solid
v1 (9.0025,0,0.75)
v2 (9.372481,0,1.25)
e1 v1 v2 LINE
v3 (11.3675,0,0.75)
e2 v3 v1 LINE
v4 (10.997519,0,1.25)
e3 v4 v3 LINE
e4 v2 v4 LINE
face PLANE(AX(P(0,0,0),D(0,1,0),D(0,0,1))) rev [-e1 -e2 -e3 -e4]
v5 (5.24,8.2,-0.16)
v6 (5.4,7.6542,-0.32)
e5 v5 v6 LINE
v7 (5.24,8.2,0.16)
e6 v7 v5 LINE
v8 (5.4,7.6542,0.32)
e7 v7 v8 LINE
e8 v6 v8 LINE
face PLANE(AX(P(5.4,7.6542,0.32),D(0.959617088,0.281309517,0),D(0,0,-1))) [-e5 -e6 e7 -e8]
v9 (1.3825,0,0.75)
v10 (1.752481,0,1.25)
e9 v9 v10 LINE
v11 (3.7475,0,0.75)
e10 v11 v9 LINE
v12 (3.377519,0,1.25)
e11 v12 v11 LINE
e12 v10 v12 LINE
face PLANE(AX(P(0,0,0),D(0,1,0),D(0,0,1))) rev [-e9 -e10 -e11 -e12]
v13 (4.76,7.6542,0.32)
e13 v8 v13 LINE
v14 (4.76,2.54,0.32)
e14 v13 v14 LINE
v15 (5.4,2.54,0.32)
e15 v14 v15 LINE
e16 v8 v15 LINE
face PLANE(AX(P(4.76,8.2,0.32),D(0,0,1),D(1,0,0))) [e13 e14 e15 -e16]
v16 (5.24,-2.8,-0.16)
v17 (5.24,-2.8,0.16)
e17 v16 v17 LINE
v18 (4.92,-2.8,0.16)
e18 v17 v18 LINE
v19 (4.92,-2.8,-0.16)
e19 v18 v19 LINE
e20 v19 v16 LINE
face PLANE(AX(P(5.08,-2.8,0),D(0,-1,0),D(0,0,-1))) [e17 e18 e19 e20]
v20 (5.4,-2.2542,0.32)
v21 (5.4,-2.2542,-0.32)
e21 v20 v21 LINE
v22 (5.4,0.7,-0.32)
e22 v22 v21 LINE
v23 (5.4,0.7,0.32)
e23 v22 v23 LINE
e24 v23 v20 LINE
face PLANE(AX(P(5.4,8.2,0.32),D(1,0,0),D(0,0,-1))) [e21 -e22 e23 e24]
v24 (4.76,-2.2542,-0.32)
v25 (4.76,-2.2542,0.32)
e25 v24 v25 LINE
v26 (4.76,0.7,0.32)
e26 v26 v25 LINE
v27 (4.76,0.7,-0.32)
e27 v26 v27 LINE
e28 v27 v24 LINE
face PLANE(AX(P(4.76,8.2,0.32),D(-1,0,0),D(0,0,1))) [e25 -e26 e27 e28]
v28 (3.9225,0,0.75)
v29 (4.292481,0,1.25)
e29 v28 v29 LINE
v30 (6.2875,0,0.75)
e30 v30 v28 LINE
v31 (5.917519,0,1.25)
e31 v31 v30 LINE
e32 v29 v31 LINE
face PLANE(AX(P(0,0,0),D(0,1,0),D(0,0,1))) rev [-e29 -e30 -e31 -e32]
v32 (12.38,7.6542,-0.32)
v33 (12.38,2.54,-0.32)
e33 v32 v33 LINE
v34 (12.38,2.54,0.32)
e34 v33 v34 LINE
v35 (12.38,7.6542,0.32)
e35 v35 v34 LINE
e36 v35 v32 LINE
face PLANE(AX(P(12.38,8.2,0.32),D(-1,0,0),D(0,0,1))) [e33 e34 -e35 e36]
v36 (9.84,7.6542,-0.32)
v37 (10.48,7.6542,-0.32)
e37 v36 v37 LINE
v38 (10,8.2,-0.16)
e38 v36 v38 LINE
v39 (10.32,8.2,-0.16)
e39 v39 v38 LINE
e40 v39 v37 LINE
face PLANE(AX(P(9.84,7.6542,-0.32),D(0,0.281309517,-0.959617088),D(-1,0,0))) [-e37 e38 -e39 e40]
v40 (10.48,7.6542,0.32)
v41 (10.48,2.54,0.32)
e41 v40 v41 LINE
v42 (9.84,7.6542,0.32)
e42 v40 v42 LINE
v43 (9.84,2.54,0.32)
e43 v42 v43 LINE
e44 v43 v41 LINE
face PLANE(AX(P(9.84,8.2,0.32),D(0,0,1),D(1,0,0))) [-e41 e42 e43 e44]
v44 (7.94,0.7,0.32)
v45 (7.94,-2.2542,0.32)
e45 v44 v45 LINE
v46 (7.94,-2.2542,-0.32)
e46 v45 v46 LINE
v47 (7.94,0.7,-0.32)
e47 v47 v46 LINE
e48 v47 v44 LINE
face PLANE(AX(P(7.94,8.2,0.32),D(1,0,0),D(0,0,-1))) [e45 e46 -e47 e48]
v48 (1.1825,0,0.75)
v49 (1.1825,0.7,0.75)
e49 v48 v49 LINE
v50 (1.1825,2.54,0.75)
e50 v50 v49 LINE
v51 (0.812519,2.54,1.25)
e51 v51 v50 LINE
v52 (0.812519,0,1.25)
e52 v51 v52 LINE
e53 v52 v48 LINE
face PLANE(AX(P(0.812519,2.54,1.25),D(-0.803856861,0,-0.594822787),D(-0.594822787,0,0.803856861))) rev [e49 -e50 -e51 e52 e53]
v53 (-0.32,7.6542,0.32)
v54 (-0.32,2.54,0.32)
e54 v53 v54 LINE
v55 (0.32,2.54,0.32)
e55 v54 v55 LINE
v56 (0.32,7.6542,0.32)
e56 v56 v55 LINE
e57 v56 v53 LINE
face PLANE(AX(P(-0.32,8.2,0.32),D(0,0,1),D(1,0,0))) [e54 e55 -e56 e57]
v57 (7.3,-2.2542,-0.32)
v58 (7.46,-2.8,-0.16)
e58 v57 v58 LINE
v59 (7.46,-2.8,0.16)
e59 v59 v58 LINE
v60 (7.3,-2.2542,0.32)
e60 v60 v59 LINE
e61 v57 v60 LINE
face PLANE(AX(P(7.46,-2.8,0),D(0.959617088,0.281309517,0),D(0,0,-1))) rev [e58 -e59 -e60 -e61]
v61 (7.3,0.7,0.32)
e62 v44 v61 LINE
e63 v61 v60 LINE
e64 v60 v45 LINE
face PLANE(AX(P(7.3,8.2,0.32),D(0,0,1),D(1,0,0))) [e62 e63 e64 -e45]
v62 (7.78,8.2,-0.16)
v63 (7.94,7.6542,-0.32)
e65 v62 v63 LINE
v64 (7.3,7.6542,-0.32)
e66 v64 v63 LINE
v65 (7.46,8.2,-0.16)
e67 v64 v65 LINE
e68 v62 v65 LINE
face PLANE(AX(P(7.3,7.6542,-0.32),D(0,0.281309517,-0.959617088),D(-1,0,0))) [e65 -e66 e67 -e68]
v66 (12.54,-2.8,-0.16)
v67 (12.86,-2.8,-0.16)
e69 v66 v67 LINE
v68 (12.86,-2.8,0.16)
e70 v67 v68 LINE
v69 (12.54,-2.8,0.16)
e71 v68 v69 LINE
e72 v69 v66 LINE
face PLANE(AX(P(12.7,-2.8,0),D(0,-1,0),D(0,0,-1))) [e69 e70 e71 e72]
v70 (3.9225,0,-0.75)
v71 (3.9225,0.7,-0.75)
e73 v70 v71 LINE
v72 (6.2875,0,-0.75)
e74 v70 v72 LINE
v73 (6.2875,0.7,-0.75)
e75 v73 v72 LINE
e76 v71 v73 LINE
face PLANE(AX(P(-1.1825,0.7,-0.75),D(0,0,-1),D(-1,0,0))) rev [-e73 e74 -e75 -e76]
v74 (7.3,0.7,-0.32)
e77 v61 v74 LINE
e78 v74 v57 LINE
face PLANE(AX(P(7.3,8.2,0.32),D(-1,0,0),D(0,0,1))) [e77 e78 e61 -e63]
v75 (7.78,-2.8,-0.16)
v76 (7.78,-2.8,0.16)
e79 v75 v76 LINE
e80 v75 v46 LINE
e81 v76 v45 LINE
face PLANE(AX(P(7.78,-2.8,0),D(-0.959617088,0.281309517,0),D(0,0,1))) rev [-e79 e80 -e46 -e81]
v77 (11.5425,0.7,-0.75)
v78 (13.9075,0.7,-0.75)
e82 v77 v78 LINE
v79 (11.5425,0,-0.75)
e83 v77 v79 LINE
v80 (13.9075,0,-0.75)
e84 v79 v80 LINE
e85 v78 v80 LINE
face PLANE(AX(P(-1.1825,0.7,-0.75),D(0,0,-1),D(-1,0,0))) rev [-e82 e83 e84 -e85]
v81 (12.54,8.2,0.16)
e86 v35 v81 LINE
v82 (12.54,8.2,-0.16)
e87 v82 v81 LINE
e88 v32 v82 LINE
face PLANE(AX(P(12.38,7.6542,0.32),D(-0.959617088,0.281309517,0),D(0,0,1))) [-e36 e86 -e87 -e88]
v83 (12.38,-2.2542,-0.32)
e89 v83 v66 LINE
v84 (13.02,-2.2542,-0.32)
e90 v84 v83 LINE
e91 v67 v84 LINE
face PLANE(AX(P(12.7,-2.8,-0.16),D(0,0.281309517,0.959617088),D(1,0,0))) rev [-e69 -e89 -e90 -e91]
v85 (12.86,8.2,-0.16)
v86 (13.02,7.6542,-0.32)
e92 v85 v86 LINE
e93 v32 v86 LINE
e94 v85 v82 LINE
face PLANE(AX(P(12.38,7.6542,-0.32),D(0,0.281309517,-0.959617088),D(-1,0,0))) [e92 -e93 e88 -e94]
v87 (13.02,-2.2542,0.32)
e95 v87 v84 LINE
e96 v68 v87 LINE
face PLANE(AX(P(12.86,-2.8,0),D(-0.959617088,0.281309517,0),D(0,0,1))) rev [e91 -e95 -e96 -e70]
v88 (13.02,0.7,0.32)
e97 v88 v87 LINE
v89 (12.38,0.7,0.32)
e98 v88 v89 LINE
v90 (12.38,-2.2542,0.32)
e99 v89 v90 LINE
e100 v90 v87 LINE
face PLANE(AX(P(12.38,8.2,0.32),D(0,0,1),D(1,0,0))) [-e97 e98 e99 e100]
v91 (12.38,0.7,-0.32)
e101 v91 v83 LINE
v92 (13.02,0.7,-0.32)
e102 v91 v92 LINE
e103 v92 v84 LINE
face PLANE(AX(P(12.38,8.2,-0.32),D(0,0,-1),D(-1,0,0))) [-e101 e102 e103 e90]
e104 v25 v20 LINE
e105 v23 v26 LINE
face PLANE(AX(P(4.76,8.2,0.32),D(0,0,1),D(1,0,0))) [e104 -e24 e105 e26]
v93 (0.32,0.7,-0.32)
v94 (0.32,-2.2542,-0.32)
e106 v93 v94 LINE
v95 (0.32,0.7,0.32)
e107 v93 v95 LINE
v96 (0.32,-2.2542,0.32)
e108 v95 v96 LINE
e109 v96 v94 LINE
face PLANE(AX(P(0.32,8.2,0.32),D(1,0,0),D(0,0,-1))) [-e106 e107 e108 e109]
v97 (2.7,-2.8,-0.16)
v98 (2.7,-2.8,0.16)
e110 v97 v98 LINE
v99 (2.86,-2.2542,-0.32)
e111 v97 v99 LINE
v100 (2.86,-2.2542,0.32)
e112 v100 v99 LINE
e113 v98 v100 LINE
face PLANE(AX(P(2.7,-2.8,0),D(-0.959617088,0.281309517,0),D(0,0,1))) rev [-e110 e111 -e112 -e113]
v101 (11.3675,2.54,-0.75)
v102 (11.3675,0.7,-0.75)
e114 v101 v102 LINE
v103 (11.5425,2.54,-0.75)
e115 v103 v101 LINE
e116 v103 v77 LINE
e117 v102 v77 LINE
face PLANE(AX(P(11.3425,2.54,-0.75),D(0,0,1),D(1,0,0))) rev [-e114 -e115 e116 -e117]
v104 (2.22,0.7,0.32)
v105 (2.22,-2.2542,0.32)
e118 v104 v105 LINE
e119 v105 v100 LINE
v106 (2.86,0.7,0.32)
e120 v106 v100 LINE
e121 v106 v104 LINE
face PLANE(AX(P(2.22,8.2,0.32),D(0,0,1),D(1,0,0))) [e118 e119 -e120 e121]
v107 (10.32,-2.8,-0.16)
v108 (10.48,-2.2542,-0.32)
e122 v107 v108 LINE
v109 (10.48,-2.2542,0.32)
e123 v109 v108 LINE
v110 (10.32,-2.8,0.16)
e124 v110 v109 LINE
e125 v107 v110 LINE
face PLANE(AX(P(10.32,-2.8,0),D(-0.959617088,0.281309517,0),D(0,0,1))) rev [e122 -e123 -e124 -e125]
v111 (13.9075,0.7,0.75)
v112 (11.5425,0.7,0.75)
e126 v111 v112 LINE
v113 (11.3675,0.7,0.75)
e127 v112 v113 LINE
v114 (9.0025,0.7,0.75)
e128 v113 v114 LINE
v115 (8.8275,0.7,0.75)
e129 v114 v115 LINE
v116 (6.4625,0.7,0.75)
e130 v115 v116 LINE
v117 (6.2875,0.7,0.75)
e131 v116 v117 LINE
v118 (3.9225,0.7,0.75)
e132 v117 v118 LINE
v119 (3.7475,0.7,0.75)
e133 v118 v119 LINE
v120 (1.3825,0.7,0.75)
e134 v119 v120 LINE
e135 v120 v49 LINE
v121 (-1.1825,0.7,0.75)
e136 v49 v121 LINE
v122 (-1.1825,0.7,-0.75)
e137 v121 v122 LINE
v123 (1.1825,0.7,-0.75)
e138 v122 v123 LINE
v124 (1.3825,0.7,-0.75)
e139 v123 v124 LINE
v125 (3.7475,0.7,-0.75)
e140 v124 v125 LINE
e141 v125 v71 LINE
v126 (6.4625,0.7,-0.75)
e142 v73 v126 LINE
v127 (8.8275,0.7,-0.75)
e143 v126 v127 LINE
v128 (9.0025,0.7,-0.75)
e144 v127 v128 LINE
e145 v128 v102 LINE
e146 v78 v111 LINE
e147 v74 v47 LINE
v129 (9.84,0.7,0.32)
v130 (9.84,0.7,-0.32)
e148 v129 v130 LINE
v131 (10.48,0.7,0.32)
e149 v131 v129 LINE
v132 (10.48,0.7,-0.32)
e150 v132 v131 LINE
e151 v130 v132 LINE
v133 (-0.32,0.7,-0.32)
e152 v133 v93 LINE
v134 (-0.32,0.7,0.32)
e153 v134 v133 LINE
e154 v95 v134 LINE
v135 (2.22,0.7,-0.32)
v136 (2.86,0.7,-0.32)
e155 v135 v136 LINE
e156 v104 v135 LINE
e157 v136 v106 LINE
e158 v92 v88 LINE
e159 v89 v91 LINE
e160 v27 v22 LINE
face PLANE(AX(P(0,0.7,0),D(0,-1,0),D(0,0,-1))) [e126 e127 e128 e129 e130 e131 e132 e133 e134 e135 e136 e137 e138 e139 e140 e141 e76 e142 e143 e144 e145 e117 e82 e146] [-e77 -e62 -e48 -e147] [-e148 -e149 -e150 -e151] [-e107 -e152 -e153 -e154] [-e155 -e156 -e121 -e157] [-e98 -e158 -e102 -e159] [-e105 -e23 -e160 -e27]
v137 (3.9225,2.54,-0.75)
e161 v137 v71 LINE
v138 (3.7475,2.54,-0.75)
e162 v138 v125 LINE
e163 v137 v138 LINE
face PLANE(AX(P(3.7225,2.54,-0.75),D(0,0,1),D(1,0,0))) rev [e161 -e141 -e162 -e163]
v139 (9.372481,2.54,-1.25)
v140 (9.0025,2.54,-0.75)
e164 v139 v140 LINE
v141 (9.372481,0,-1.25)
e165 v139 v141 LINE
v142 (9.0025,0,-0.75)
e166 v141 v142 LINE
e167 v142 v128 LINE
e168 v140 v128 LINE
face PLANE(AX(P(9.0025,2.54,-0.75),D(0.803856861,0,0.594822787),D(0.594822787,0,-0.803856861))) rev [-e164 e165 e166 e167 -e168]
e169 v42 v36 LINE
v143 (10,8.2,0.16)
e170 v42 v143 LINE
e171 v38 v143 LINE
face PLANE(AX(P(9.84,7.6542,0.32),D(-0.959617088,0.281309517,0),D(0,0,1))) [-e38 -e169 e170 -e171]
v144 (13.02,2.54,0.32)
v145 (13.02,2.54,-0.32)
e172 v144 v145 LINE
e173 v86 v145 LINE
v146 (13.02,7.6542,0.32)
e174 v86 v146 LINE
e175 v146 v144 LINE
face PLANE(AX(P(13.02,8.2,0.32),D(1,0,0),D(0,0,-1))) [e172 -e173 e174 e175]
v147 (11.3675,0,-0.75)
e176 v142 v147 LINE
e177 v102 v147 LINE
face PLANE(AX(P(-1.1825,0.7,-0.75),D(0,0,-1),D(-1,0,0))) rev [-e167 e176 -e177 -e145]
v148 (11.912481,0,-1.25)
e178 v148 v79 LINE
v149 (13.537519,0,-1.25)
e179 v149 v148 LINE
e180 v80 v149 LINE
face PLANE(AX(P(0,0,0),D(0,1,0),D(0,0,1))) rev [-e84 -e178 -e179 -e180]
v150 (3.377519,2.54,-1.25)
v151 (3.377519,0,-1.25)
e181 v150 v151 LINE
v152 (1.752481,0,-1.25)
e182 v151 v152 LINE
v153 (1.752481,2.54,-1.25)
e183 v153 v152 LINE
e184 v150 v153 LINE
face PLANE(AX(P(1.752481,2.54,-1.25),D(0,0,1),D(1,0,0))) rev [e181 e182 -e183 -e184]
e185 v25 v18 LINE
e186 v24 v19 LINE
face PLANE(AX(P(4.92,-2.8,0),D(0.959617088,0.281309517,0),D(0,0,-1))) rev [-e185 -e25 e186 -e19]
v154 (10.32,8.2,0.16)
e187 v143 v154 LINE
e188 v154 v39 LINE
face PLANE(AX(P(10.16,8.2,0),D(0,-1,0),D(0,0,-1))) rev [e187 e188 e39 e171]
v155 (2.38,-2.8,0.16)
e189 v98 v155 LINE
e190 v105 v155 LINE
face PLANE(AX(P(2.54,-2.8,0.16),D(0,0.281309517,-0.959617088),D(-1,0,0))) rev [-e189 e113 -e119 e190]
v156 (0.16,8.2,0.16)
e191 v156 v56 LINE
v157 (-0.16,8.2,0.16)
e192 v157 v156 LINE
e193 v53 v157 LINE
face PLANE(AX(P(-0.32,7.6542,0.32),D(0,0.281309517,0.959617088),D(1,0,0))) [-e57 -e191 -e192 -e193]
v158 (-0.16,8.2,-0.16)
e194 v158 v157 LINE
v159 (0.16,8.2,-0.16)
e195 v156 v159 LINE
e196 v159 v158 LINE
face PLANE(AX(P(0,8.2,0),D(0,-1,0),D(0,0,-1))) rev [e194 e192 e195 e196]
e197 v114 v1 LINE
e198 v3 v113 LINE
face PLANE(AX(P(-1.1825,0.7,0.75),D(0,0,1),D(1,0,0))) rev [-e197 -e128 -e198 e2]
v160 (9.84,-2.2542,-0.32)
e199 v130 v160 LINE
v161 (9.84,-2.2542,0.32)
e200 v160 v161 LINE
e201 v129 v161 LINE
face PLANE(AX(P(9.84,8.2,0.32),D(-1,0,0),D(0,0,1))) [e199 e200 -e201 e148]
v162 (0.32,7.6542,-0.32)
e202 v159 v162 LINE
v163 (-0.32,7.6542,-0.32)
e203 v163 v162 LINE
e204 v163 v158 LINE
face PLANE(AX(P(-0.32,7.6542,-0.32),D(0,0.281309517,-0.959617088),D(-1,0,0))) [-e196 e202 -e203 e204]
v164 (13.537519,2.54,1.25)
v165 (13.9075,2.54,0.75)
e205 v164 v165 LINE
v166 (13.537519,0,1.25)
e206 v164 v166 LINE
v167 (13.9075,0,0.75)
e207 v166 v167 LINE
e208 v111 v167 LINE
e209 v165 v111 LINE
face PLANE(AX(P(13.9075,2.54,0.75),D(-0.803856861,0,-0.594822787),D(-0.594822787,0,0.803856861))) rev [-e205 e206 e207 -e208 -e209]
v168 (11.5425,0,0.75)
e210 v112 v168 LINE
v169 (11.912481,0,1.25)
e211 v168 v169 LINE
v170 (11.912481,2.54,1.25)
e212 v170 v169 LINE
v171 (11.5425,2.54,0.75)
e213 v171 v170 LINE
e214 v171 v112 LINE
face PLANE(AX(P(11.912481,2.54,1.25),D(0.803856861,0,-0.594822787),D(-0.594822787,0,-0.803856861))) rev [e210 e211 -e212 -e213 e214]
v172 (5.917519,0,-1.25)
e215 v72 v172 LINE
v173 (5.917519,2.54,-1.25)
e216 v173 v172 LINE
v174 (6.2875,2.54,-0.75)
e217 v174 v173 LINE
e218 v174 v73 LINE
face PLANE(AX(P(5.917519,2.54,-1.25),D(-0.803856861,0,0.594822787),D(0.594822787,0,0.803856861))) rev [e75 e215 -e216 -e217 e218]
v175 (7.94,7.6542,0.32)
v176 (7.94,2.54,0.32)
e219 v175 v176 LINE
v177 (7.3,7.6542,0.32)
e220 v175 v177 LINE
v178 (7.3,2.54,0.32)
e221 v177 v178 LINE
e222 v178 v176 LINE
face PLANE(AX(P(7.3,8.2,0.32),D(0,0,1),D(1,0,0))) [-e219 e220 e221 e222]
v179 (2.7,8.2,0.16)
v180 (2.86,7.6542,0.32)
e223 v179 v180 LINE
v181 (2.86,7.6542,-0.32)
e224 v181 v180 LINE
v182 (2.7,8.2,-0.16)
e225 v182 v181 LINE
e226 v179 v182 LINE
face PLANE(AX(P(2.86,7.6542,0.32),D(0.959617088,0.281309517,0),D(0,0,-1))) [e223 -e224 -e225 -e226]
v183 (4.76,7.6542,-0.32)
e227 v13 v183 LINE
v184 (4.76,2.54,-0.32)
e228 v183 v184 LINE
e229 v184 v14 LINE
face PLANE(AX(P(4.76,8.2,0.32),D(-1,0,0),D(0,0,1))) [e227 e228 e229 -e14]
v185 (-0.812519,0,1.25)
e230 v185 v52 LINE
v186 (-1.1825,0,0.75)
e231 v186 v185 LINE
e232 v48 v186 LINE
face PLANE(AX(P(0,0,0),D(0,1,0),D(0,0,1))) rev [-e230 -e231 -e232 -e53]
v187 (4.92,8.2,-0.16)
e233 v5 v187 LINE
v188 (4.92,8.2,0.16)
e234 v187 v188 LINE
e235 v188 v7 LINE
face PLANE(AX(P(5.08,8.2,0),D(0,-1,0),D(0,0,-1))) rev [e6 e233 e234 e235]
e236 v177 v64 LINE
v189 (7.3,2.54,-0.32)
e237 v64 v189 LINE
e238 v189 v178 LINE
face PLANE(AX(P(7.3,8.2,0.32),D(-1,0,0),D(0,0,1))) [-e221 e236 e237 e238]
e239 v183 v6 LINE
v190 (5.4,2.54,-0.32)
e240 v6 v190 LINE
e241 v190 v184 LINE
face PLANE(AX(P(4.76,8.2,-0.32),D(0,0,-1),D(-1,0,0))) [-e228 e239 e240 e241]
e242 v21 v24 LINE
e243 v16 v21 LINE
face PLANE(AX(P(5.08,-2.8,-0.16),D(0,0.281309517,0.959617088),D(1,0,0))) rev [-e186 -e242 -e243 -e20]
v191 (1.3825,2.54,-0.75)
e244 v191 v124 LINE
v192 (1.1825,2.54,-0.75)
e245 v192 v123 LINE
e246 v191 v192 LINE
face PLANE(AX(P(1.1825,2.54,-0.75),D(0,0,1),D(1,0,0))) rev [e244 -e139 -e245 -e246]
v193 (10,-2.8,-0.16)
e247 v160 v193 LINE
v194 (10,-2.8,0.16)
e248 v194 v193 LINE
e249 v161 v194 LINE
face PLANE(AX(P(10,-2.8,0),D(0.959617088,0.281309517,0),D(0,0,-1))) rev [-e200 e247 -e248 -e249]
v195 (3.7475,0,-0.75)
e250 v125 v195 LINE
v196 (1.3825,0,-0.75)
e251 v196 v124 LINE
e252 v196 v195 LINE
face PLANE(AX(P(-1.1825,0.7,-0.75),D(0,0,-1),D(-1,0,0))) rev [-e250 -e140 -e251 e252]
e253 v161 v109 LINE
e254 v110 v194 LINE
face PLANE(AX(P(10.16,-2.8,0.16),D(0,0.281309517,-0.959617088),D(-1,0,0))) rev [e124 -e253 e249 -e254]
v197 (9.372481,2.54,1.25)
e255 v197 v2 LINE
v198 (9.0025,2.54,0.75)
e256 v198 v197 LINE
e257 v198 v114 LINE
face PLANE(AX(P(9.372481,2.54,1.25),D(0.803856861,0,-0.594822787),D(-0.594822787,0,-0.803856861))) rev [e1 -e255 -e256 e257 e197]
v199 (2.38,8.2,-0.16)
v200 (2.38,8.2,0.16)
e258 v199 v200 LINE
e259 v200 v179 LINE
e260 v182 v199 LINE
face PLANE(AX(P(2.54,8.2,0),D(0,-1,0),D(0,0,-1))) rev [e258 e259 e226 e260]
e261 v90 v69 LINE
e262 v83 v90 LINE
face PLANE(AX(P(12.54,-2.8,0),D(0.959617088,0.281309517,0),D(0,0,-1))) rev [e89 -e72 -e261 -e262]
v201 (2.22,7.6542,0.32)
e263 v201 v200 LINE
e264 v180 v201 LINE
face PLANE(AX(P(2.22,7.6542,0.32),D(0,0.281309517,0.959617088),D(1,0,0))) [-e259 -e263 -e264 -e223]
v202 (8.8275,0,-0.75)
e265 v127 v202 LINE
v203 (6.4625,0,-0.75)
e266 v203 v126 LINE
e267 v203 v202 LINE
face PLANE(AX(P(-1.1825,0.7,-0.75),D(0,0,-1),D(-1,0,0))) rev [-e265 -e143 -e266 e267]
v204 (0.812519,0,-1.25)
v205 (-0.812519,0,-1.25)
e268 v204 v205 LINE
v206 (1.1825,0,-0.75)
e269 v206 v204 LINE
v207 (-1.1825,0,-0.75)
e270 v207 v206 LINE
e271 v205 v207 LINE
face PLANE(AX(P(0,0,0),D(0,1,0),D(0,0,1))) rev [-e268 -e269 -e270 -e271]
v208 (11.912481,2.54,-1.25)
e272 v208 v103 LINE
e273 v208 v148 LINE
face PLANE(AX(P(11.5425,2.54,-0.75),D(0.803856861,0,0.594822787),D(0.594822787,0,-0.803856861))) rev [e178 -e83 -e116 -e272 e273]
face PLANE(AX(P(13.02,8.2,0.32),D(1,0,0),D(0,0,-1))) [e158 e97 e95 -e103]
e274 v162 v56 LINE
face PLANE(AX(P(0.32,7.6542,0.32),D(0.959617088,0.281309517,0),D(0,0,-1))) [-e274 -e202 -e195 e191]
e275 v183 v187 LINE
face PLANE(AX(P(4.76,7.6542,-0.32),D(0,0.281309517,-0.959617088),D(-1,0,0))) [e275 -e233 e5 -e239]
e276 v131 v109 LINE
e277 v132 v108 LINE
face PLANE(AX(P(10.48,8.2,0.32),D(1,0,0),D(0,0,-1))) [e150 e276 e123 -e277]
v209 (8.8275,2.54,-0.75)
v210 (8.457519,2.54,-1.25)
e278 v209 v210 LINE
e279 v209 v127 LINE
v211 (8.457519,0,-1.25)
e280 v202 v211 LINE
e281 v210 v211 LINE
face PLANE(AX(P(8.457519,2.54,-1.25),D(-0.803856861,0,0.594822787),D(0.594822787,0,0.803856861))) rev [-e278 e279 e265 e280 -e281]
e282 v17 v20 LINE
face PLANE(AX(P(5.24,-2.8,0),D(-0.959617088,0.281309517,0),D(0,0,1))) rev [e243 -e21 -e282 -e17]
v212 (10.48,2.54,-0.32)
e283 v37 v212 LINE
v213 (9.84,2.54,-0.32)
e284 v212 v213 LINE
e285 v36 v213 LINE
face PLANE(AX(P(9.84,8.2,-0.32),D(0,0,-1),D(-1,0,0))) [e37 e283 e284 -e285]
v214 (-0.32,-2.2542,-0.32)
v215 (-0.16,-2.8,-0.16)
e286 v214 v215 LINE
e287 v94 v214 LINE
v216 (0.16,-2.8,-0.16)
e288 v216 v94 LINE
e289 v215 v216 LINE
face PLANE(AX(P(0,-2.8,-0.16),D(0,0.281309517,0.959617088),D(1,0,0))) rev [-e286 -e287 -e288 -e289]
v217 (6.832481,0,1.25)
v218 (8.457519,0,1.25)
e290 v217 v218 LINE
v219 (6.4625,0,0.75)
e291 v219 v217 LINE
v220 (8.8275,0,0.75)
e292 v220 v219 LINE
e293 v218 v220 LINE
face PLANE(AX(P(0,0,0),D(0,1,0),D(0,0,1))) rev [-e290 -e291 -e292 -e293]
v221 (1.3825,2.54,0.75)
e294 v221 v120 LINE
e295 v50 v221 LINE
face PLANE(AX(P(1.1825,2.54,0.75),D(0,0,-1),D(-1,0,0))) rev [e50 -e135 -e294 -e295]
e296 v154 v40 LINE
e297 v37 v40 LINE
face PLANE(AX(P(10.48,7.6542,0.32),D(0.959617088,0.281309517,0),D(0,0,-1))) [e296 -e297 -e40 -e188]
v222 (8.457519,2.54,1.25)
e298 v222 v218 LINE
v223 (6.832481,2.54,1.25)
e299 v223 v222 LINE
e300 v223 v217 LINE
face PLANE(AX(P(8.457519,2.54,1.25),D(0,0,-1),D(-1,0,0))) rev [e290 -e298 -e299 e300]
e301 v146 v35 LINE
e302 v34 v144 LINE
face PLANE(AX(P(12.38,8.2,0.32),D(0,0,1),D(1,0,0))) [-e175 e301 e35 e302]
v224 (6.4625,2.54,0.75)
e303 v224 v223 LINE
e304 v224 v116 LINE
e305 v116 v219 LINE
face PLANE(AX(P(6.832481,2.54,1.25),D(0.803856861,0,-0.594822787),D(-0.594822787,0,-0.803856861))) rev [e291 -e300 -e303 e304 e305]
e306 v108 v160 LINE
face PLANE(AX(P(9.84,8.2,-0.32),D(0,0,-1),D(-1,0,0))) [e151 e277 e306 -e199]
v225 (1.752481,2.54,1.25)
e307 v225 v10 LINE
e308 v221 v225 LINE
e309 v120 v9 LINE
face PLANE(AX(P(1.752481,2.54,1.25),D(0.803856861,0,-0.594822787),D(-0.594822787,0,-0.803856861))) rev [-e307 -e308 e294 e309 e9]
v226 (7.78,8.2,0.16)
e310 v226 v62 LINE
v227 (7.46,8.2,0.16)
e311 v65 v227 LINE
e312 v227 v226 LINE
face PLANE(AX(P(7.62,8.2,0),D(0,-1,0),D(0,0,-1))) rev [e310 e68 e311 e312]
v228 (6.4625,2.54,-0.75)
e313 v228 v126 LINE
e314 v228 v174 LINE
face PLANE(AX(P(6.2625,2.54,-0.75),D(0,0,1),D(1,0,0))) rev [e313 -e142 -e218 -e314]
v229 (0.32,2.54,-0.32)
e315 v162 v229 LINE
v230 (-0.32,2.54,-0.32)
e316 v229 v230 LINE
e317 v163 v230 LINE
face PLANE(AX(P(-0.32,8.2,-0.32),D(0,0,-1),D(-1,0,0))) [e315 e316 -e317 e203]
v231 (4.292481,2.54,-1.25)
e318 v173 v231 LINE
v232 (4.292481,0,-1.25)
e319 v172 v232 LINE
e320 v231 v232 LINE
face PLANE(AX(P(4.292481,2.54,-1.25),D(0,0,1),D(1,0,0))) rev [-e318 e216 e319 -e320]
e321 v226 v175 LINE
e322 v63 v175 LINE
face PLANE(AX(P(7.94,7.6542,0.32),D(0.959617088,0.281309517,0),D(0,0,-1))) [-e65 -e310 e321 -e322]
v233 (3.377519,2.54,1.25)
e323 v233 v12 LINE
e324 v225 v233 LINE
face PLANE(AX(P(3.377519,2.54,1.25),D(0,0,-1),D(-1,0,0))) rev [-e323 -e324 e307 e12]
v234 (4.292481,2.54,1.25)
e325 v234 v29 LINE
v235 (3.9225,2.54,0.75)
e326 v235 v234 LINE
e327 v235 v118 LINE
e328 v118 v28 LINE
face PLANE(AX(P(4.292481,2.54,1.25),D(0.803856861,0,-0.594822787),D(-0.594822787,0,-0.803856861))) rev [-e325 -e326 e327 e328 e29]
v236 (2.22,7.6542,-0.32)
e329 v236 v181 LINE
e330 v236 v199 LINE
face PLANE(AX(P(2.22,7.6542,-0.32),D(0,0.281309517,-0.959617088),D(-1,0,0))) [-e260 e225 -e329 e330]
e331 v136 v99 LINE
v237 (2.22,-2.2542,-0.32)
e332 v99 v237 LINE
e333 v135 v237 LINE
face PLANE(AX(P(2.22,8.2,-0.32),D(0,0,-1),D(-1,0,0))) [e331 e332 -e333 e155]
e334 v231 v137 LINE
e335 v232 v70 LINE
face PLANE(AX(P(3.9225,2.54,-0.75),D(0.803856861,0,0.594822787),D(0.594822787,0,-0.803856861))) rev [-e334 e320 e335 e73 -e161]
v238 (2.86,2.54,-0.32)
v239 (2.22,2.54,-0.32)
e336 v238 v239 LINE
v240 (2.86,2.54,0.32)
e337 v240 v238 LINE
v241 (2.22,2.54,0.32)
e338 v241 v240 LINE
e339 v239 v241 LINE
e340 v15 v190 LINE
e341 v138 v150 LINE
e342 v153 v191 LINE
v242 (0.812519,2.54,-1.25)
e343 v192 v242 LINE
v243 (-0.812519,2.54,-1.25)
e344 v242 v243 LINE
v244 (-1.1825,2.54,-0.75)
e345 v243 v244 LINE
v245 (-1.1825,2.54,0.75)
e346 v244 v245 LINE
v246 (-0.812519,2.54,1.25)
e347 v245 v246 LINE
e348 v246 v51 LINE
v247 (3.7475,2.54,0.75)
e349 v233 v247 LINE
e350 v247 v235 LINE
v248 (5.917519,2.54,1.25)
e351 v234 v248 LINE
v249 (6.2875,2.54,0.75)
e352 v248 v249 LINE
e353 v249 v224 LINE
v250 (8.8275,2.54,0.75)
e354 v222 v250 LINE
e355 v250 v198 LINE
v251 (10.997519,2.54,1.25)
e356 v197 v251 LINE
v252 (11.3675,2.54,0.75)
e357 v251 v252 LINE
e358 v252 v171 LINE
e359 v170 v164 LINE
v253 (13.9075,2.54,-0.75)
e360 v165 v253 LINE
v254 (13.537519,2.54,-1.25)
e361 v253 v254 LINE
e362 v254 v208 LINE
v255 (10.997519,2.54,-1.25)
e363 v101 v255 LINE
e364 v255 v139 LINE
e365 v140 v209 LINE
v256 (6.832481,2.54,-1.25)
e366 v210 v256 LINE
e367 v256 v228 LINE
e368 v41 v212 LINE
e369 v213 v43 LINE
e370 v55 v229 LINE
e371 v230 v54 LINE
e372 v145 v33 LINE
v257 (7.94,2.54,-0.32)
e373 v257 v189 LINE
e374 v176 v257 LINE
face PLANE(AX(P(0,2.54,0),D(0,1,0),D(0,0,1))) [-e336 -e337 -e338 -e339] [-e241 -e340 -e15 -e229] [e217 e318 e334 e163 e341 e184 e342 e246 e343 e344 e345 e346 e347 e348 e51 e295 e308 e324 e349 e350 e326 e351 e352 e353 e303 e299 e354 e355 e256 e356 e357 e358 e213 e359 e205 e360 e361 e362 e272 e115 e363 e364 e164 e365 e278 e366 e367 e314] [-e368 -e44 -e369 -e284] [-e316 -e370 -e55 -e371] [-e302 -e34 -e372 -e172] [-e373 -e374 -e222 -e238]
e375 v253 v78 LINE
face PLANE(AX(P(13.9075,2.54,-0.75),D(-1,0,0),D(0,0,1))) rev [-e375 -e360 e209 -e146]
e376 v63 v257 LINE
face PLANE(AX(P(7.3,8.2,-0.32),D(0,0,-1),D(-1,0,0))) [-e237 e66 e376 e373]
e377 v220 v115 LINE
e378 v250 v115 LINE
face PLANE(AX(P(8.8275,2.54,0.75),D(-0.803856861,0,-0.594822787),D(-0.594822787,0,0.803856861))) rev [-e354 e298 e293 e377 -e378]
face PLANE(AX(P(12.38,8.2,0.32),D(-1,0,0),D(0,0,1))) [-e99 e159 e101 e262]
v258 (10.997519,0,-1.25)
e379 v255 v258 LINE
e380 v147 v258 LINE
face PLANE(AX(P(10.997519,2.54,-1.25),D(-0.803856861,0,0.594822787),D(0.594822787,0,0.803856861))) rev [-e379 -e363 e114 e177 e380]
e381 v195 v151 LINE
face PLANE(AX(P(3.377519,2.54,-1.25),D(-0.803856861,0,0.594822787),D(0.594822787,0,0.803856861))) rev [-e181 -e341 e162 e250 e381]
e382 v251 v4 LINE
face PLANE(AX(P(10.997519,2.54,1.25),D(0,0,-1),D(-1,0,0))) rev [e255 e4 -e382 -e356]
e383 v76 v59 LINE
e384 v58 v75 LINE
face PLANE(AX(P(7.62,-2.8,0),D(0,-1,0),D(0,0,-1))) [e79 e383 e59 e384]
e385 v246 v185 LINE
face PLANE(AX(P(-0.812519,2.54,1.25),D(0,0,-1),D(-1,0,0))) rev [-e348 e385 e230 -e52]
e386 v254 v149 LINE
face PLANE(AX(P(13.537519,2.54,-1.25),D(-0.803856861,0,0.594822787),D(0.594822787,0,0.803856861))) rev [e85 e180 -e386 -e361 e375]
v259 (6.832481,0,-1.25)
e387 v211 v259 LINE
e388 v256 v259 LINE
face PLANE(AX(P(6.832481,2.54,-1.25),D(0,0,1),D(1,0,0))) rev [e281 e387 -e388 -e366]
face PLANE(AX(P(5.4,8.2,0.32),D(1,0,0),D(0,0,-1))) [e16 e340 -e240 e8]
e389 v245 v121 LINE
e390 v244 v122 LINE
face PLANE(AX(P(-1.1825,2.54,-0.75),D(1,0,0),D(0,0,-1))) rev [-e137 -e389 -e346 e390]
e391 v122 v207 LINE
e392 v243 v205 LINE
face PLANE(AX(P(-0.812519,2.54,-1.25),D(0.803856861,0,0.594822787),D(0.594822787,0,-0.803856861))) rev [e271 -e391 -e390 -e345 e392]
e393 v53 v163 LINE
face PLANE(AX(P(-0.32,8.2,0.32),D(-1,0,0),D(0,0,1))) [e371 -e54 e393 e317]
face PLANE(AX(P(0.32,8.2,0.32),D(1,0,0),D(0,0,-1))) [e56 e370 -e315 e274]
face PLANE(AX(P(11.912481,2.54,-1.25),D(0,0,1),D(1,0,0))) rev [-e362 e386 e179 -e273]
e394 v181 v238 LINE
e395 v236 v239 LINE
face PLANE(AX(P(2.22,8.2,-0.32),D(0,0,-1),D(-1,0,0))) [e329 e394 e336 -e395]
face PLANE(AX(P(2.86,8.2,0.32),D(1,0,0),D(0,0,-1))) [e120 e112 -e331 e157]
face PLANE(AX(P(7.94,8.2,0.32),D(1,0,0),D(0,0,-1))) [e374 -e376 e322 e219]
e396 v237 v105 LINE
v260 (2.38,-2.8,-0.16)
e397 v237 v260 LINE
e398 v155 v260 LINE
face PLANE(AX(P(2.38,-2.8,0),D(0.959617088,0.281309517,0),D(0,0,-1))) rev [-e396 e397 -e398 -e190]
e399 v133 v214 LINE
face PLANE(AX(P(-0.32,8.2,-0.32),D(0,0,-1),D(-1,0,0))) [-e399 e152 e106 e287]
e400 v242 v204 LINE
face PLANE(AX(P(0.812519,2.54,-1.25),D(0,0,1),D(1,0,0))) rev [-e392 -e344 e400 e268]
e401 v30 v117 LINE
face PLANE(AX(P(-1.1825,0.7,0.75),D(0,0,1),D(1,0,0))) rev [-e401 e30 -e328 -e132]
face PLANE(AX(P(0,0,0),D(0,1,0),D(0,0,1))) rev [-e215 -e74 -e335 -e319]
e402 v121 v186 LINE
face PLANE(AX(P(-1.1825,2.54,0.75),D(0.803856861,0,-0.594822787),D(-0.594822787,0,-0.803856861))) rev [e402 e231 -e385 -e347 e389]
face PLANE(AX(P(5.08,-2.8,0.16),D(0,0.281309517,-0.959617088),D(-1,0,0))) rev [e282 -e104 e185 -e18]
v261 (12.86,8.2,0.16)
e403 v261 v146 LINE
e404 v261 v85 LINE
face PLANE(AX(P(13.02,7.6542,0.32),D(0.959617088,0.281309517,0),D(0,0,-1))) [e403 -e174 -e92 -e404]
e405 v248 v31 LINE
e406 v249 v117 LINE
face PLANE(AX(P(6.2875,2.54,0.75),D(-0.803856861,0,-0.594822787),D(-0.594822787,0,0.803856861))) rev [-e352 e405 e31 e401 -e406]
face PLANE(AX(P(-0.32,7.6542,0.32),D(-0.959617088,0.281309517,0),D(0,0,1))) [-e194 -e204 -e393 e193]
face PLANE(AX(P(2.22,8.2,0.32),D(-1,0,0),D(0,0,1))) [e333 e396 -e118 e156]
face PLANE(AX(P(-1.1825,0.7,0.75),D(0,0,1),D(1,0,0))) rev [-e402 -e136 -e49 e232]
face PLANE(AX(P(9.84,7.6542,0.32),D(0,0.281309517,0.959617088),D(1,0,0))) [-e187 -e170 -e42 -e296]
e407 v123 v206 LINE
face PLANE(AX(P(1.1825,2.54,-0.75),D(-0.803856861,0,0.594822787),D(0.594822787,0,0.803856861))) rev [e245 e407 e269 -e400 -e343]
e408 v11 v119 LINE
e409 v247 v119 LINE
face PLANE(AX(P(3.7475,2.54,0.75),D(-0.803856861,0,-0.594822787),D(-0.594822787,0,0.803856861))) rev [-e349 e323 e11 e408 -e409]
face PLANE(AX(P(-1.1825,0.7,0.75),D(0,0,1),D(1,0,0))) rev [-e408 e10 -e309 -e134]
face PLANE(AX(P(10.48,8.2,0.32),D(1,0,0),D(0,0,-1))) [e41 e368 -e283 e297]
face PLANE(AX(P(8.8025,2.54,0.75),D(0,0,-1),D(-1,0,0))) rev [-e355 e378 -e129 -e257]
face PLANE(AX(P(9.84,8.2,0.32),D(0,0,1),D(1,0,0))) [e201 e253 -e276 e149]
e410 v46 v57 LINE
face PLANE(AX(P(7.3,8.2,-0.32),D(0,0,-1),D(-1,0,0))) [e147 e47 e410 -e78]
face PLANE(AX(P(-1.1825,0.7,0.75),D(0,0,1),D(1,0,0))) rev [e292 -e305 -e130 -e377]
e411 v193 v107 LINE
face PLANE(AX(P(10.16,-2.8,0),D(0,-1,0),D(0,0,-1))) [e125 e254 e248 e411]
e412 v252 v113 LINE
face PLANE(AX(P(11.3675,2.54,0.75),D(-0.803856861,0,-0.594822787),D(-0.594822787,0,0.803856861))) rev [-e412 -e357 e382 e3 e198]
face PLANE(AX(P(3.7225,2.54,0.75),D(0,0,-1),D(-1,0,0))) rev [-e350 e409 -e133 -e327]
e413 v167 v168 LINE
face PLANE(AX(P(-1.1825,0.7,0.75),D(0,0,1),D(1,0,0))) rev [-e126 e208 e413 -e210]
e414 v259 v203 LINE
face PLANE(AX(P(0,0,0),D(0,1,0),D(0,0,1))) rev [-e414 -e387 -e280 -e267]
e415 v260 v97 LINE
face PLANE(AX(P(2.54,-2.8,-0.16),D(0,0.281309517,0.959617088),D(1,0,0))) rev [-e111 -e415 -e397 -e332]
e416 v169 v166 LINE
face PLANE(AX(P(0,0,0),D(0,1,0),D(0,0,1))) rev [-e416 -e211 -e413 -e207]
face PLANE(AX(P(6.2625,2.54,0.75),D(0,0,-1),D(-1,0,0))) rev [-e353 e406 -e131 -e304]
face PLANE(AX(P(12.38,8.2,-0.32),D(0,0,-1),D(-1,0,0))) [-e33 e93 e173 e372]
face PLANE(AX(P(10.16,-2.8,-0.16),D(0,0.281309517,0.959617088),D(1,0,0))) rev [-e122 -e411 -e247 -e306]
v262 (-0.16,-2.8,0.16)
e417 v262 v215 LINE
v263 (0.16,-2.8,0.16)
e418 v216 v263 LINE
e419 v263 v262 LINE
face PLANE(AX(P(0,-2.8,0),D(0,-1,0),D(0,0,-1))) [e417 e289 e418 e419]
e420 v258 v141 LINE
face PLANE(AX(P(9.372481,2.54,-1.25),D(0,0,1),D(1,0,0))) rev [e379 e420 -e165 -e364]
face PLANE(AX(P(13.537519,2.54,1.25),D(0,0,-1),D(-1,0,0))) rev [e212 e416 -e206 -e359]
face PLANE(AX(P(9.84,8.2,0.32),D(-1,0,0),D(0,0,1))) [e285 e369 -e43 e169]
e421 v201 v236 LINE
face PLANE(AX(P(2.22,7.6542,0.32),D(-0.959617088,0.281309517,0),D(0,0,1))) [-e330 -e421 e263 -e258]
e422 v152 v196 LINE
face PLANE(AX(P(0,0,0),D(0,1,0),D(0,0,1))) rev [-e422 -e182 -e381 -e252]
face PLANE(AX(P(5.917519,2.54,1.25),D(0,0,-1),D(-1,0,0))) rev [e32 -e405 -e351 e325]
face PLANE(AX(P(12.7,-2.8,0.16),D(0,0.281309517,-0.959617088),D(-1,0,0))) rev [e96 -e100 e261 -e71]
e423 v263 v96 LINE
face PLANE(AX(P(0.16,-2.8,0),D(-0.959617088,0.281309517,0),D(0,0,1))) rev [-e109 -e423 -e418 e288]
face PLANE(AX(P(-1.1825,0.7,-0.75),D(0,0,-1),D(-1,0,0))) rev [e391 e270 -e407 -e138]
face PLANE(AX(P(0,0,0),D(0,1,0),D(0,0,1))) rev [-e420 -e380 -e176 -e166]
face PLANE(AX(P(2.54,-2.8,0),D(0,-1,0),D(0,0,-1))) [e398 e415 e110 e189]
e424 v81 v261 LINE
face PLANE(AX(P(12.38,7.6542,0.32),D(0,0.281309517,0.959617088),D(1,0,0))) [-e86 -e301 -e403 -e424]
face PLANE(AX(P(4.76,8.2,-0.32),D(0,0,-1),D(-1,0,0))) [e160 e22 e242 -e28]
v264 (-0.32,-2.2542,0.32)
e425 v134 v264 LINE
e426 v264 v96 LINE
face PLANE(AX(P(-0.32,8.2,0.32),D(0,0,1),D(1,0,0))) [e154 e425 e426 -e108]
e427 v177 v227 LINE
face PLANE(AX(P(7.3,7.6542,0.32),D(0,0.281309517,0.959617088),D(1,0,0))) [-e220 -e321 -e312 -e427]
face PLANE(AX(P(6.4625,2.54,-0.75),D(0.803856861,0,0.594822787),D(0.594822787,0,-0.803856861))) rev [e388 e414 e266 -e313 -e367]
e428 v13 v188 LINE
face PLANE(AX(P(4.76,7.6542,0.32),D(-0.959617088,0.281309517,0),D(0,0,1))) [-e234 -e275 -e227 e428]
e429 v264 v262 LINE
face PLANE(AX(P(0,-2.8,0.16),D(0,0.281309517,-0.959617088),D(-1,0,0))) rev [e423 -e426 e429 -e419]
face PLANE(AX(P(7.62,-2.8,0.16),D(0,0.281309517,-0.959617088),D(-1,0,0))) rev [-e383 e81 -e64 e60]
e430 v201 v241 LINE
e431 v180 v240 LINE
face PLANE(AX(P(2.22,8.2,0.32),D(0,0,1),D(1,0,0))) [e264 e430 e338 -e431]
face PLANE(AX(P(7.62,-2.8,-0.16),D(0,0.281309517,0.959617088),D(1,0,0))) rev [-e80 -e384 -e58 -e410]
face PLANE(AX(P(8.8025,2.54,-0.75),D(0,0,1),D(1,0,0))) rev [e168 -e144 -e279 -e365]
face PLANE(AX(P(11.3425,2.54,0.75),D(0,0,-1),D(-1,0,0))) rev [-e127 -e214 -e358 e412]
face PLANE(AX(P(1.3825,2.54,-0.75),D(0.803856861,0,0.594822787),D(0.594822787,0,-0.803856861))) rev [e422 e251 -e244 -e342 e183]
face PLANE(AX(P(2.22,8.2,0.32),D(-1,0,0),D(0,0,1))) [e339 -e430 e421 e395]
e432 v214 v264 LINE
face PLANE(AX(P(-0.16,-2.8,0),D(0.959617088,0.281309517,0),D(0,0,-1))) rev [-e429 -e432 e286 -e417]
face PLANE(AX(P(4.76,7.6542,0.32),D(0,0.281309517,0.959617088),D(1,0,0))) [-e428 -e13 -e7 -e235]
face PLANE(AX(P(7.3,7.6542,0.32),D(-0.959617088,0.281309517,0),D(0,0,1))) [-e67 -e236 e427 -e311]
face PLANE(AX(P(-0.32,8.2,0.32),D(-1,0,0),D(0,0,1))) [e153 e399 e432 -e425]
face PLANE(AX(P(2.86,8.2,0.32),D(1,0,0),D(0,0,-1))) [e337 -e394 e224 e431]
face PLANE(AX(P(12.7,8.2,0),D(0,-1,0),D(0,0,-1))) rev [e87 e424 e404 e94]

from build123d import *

# Parameters (mm, degrees)
BOSS_EXTRUDE3_DEPTH = 2.54
BOSS_EXTRUDE4_DEPTH = 2.54
LPATTERN1_COUNT     = 5
LPATTERN1_PITCH     = 2.54
SKETCH8_W           = 100
SKETCH8_H           = 1.5
CUT_EXTRUDE4_DEPTH  = 0.7
BOSS_EXTRUDE5_START = -8.2
SKETCH3_W           = 0.64
SKETCH3_H           = 0.64
BOSS_EXTRUDE5_DEPTH = 11
CHAMFER1_SIZE       = 0.16
CHAMFER1_SIZE2      = 0.5458
CHAMFER2_SIZE       = 0.16
CHAMFER2_SIZE2      = 0.5458
LPATTERN2_START     = 2.22
LPATTERN2_DEPTH     = 0.64
LPATTERN2_START_2   = 4.76
LPATTERN2_2_DEPTH   = 0.64
LPATTERN2_START_3   = 7.3
LPATTERN2_3_DEPTH   = 0.64
LPATTERN2_START_4   = 9.84
LPATTERN2_4_DEPTH   = 0.64
LPATTERN2_START_5   = 12.38
LPATTERN2_5_DEPTH   = 0.64
LPATTERN2_START_6   = -1
LPATTERN2_6_DEPTH   = 2


with BuildPart() as part:
    # Sketch6 → Boss-Extrude3 (new body)
    with BuildSketch(Plane(origin=(0, 0, 0), x_dir=(1, 0, 0), z_dir=(0, 1, 0))):
        Polygon((-1.1825, 0.75), (-1.1825, -0.75), (-0.812519462, -1.25), (0.812519462, -1.25), (1.1825, -0.75), (1.1825, 0.75), (0.812519462, 1.25), (-0.812519462, 1.25), align=None)
    extrude(amount=BOSS_EXTRUDE3_DEPTH)

    # Sketch7 → Boss-Extrude4 (add)
    with BuildSketch(Plane(origin=(0, 0, 0), x_dir=(1, 0, 0), z_dir=(0, 1, 0))):
        Polygon((1.1825, 0.75), (1.1825, -0.75), (1.3825, -0.75), (1.752480538, -1.25), (3.377519462, -1.25), (3.7475, -0.75), (3.7475, 0.75), (3.377519462, 1.25), (1.752480538, 1.25), (1.3825, 0.75), align=None)
    boss_extrude4 = extrude(amount=BOSS_EXTRUDE4_DEPTH)

    # LPattern1: Boss-Extrude4 ×5
    with Locations(*[(i * LPATTERN1_PITCH, 0, 0) for i in range(1, LPATTERN1_COUNT)]):
        add(boss_extrude4)

    # Sketch8 → Cut-Extrude4 (cut)
    with BuildSketch(Plane.XZ):
        with Locations((48.8175, 0)):
            Rectangle(SKETCH8_W, SKETCH8_H)
    extrude(amount=-CUT_EXTRUDE4_DEPTH, mode=Mode.SUBTRACT)

    # Sketch3 → Boss-Extrude5 (add)
    with BuildSketch(Plane(origin=(0, 0, 0), x_dir=(-1, 0, 0), z_dir=(0, -1, 0)).offset(BOSS_EXTRUDE5_START)):
        Rectangle(SKETCH3_W, SKETCH3_H)
    extrude(amount=BOSS_EXTRUDE5_DEPTH)

    # Chamfer1
    chamfer1_edges = [part.edges().sort_by_distance(p)[0] for p in [
        (-0.32, -2.8, 0),
        (0, -2.8, -0.32),
        (0.32, -2.8, 0),
        (0, -2.8, 0.32),
    ]]
    chamfer1_side = [part.faces().sort_by_distance(p)[0] for p in [
        (0, -2.8, 0),
    ]]
    chamfer(chamfer1_edges, length=CHAMFER1_SIZE, length2=CHAMFER1_SIZE2, reference=chamfer1_side[0])

    # Chamfer2
    chamfer2_edges = [part.edges().sort_by_distance(p)[0] for p in [
        (-0.32, 8.2, 0),
        (0, 8.2, 0.32),
        (0.32, 8.2, 0),
        (0, 8.2, -0.32),
    ]]
    chamfer2_side = [part.faces().sort_by_distance(p)[0] for p in [
        (0, 8.2, 0),
    ]]
    chamfer(chamfer2_edges, length=CHAMFER2_SIZE, length2=CHAMFER2_SIZE2, reference=chamfer2_side[0])

    # LPattern2: read off the stored shape, not the designer's step
    # LPattern2 outline → LPattern2 (add)
    with BuildSketch(Plane.YZ.offset(LPATTERN2_START)):
        Polygon((-2.2542, 0.32), (-2.8, 0.16), (-2.8, -0.16), (-2.2542, -0.32), (0.7, -0.32), (0.7, 0.32), align=None)
        Polygon((2.54, 0.32), (2.54, -0.32), (7.6542, -0.32), (8.2, -0.16), (8.2, 0.16), (7.6542, 0.32), align=None)
    extrude(amount=LPATTERN2_DEPTH)

    # LPattern2 2 outline → LPattern2 2 (add)
    with BuildSketch(Plane.YZ.offset(LPATTERN2_START_2)):
        Polygon((-2.2542, 0.32), (-2.8, 0.16), (-2.8, -0.16), (-2.2542, -0.32), (0.7, -0.32), (0.7, 0.32), align=None)
        Polygon((2.54, 0.32), (2.54, -0.32), (7.6542, -0.32), (8.2, -0.16), (8.2, 0.16), (7.6542, 0.32), align=None)
    extrude(amount=LPATTERN2_2_DEPTH)

    # LPattern2 3 outline → LPattern2 3 (add)
    with BuildSketch(Plane.YZ.offset(LPATTERN2_START_3)):
        Polygon((-2.2542, 0.32), (-2.8, 0.16), (-2.8, -0.16), (-2.2542, -0.32), (0.7, -0.32), (0.7, 0.32), align=None)
        Polygon((2.54, 0.32), (2.54, -0.32), (7.6542, -0.32), (8.2, -0.16), (8.2, 0.16), (7.6542, 0.32), align=None)
    extrude(amount=LPATTERN2_3_DEPTH)

    # LPattern2 4 outline → LPattern2 4 (add)
    with BuildSketch(Plane.YZ.offset(LPATTERN2_START_4)):
        Polygon((-2.2542, 0.32), (-2.8, 0.16), (-2.8, -0.16), (-2.2542, -0.32), (0.7, -0.32), (0.7, 0.32), align=None)
        Polygon((2.54, 0.32), (2.54, -0.32), (7.6542, -0.32), (8.2, -0.16), (8.2, 0.16), (7.6542, 0.32), align=None)
    extrude(amount=LPATTERN2_4_DEPTH)

    # LPattern2 5 outline → LPattern2 5 (add)
    with BuildSketch(Plane.YZ.offset(LPATTERN2_START_5)):
        Polygon((-2.2542, 0.32), (-2.8, 0.16), (-2.8, -0.16), (-2.2542, -0.32), (0.7, -0.32), (0.7, 0.32), align=None)
        Polygon((2.54, 0.32), (2.54, -0.32), (7.6542, -0.32), (8.2, -0.16), (8.2, 0.16), (7.6542, 0.32), align=None)
    extrude(amount=LPATTERN2_5_DEPTH)

    # LPattern2 6 outline → LPattern2 6 (cut)
    with BuildSketch(Plane.XY.offset(LPATTERN2_START_6)):
        Polygon((2.86, -2.8), (2.86, -2.2542), (2.7, -2.8), align=None)
        Polygon((2.22, -2.8), (2.38, -2.8), (2.22, -2.2542), align=None)
        Polygon((4.76, -2.8), (4.92, -2.8), (4.76, -2.2542), align=None)
        Polygon((5.4, -2.2542), (5.24, -2.8), (5.4, -2.8), align=None)
        Polygon((7.3, -2.8), (7.46, -2.8), (7.3, -2.2542), align=None)
        Polygon((7.94, -2.2542), (7.78, -2.8), (7.94, -2.8), align=None)
        Polygon((9.84, -2.8), (10, -2.8), (9.84, -2.2542), align=None)
        Polygon((10.48, -2.2542), (10.32, -2.8), (10.48, -2.8), align=None)
        Polygon((12.38, -2.8), (12.54, -2.8), (12.38, -2.2542), align=None)
        Polygon((13.02, -2.2542), (12.86, -2.8), (13.02, -2.8), align=None)
        Polygon((2.22, 7.6542), (2.38, 8.2), (2.22, 8.2), align=None)
        Polygon((2.86, 8.2), (2.7, 8.2), (2.86, 7.6542), align=None)
        Polygon((4.76, 7.6542), (4.92, 8.2), (4.76, 8.2), align=None)
        Polygon((5.24, 8.2), (5.4, 7.6542), (5.4, 8.2), align=None)
        Polygon((7.3, 7.6542), (7.46, 8.2), (7.3, 8.2), align=None)
        Polygon((7.78, 8.2), (7.94, 7.6542), (7.94, 8.2), align=None)
        Polygon((9.84, 7.6542), (10, 8.2), (9.84, 8.2), align=None)
        Polygon((10.32, 8.2), (10.48, 7.6542), (10.48, 8.2), align=None)
        Polygon((12.38, 7.6542), (12.54, 8.2), (12.38, 8.2), align=None)
        Polygon((12.86, 8.2), (13.02, 7.6542), (13.02, 8.2), align=None)
    extrude(amount=LPATTERN2_6_DEPTH, mode=Mode.SUBTRACT)


solid = part.part
